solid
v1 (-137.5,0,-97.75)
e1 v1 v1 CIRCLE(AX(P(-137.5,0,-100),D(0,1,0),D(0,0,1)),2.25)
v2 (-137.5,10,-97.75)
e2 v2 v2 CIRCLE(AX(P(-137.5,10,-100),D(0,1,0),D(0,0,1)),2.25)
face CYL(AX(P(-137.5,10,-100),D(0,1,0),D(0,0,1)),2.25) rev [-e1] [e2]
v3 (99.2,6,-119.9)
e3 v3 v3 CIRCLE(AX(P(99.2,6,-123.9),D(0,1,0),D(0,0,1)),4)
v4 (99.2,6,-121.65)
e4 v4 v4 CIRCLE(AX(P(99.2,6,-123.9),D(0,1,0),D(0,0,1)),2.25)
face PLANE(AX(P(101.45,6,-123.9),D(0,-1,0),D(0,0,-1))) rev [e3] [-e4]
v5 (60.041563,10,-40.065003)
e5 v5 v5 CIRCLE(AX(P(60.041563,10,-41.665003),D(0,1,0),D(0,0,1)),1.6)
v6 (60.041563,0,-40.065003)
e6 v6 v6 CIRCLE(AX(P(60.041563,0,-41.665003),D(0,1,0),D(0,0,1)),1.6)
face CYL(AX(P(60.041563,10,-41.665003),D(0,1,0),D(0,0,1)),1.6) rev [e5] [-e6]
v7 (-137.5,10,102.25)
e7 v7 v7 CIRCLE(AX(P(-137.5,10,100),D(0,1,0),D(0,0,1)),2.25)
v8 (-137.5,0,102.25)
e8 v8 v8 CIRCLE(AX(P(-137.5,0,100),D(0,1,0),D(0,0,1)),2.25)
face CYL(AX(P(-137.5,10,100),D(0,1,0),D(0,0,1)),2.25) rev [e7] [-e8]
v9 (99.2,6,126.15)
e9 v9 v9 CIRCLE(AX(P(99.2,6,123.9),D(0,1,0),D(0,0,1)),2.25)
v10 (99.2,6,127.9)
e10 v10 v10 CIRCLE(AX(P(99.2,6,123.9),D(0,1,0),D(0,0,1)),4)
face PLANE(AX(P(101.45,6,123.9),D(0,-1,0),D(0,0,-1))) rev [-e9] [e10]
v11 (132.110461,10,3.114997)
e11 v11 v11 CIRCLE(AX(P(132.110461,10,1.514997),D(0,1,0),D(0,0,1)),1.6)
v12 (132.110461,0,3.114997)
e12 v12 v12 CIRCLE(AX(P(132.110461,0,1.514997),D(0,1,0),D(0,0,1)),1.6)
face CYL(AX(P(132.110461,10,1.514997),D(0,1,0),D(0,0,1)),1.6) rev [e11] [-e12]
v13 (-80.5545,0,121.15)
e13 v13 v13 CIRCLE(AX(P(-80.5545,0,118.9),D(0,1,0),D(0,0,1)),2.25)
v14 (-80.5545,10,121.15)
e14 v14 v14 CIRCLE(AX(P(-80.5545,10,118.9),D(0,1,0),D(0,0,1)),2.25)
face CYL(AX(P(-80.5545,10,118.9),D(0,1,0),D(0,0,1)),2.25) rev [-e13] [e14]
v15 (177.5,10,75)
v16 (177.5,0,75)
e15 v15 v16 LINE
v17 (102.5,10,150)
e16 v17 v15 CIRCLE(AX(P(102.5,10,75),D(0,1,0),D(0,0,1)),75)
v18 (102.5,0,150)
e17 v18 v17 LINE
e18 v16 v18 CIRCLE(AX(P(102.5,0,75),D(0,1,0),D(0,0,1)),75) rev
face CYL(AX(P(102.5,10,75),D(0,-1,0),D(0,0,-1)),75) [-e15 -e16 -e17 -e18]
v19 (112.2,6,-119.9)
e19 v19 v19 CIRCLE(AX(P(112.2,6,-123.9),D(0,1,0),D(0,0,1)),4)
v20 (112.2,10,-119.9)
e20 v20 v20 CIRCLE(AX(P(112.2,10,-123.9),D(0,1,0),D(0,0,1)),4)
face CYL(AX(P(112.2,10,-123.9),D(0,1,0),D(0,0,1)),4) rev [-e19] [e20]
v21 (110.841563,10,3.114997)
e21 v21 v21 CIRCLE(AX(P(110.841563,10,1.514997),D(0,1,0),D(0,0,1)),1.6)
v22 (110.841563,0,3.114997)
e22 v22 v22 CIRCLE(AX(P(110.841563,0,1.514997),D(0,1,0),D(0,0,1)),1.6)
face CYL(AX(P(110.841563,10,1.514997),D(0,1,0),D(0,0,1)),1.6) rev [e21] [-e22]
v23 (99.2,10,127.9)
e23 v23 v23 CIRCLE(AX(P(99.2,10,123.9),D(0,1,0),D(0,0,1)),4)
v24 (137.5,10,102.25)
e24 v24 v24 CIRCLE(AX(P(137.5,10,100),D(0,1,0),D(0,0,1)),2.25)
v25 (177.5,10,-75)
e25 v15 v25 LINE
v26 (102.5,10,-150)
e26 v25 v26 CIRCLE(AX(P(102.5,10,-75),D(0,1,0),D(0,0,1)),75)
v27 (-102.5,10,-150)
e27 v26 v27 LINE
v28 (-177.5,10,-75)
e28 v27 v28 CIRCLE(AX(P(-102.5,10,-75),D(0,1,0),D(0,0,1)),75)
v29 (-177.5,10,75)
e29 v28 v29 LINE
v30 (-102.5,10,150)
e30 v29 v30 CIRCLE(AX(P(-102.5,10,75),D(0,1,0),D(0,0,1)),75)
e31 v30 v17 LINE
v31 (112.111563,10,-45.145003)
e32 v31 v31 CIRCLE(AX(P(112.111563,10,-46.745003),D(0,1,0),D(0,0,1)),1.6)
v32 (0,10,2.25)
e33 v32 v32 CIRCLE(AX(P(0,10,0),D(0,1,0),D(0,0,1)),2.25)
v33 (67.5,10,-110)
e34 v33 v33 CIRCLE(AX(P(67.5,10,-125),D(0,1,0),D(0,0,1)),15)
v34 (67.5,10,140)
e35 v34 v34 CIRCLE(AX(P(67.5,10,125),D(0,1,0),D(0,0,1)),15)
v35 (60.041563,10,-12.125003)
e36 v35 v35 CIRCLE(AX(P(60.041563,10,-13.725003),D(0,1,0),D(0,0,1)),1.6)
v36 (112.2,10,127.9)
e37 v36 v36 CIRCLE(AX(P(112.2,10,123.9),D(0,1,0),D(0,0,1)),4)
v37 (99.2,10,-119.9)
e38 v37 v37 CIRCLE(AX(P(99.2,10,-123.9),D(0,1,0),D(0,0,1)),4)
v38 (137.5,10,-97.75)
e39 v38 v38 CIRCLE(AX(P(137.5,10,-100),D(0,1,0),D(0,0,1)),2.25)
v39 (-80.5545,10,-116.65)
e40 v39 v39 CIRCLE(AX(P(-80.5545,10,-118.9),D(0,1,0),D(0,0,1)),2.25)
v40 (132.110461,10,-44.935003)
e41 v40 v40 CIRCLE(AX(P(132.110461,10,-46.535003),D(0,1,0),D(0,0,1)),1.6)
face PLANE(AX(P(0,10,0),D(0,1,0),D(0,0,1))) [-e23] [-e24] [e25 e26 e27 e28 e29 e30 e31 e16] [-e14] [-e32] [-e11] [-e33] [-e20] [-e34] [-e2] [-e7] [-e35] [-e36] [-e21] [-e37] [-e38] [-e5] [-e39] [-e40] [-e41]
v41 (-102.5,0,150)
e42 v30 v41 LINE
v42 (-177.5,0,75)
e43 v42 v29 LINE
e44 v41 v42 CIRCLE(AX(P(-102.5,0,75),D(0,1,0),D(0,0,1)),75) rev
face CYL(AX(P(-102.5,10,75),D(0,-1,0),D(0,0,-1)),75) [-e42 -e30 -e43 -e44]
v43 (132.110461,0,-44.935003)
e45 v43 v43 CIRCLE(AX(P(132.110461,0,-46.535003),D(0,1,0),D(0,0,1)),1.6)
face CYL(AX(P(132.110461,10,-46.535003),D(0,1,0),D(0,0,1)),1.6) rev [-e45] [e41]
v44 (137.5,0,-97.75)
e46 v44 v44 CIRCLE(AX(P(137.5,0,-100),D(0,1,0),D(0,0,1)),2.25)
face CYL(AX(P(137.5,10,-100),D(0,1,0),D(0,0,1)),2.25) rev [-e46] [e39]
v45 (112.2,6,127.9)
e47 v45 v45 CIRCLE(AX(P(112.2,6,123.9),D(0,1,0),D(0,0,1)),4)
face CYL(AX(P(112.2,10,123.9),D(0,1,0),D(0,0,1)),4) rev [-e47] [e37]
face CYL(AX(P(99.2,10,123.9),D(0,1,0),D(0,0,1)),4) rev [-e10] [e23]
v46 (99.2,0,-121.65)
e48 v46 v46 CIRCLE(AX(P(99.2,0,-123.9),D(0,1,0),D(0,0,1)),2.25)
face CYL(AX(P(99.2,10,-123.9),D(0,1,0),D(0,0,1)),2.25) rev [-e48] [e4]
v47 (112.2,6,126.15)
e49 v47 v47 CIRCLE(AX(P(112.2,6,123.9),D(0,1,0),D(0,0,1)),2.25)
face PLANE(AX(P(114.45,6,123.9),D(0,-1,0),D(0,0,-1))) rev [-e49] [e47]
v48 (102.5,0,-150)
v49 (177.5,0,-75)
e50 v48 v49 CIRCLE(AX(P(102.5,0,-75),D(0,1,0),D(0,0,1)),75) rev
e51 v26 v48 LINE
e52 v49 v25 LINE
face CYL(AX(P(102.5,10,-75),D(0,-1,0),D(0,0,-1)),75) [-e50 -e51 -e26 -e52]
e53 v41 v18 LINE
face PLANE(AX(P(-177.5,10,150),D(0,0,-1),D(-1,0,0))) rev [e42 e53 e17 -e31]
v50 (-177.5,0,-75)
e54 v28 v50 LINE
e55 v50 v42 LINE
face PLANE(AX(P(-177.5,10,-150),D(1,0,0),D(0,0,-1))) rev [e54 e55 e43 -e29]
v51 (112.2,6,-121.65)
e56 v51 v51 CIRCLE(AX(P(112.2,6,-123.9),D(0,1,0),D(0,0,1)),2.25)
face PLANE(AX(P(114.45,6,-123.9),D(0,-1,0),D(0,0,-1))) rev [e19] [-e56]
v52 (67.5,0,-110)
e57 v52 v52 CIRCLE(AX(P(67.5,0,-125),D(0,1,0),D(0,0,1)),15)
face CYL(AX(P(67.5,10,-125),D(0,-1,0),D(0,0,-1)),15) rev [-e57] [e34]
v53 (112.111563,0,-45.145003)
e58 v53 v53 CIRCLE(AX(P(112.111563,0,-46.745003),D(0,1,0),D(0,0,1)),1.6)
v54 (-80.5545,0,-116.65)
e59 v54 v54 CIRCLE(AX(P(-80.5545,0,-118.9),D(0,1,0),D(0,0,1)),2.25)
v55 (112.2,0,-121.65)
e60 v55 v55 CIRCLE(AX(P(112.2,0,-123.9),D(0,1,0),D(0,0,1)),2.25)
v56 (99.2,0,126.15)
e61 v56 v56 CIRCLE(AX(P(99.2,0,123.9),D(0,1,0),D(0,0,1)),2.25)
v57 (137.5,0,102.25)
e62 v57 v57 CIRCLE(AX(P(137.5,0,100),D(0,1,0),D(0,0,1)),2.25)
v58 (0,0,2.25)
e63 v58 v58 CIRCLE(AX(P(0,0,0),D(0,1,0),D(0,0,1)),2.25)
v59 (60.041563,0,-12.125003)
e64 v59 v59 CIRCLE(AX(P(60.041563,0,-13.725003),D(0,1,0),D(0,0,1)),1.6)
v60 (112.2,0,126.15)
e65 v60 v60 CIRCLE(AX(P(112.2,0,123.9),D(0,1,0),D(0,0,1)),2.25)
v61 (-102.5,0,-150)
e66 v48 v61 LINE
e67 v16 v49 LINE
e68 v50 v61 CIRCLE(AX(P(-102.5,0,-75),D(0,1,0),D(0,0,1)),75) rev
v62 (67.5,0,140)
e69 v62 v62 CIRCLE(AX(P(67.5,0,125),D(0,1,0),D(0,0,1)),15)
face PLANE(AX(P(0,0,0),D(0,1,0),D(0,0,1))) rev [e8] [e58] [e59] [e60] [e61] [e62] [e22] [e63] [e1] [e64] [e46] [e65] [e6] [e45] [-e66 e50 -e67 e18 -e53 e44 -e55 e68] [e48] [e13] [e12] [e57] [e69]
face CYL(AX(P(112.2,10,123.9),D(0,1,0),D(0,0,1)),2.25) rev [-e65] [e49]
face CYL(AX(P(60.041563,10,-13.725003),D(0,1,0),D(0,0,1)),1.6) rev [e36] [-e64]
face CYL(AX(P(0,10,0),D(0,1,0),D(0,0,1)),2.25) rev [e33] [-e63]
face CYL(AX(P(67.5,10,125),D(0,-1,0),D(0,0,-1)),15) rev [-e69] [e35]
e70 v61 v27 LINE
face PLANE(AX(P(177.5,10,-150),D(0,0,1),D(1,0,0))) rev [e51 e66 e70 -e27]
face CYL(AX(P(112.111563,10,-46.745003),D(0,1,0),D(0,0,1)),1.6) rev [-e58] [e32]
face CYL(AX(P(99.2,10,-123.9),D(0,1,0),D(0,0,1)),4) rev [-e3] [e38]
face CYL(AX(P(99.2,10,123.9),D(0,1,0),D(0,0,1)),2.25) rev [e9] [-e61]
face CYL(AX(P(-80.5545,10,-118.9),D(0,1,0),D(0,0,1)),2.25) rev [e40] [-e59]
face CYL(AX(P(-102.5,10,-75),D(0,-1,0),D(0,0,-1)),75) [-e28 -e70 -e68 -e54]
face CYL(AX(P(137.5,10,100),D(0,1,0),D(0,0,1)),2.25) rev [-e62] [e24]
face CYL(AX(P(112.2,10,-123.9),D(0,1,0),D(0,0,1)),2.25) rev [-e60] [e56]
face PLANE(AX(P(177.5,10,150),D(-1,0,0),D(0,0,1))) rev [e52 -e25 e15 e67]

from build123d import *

# Parameters (mm, degrees)
SKETCH11_W                     = 355
SKETCH11_H                     = 300
SKETCH11_R                     = 15
BOSS_EXTRUDE2_DEPTH            = 10
CBORE_FOR_M4_SHCS2_D           = 4.5
CBORE_FOR_M4_SHCS2_CBORE_D     = 8
CBORE_FOR_M4_SHCS2_CBORE_DEPTH = 4
F_3_2_3_2_DIAMETER_HOLE2_D     = 3.2
M4_CLEARANCE_HOLE1_OUTLINE_R   = 2.25
M4_CLEARANCE_HOLE1_DEPTH       = 10
M4_CLEARANCE_HOLE2_D           = 4.5
FILLET1_R                      = 75


# Read off the part's stored shape, not the designer's step: M4 Clearance Hole1
with BuildPart() as part:
    # Sketch11 → Boss-Extrude2 (new body)
    with BuildSketch(Plane(origin=(0, 0, 0), x_dir=(1, 0, 0), z_dir=(0, 1, 0))):
        Rectangle(SKETCH11_W, SKETCH11_H)
        with Locations(Location((67.5, -125, 0), (0, 0, 270))):
            Circle(SKETCH11_R, mode=Mode.SUBTRACT)
        with Locations(Location((67.5, 125, 0), (0, 0, 270))):
            Circle(SKETCH11_R, mode=Mode.SUBTRACT)
    extrude(amount=BOSS_EXTRUDE2_DEPTH)

    # CBORE for M4 SHCS2 (through all)
    with Locations(Plane(origin=(0, 10, 0), x_dir=(1, 0, 0), z_dir=(0, 1, 0))):
        with Locations((99.2, 123.9), (112.2, 123.9), (112.2, -123.9), (99.2, -123.9)):
            CounterBoreHole(CBORE_FOR_M4_SHCS2_D / 2, CBORE_FOR_M4_SHCS2_CBORE_D / 2, CBORE_FOR_M4_SHCS2_CBORE_DEPTH)

    # Ø3.2 (3.2) Diameter Hole2 (through all)
    with Locations(Plane(origin=(0, 10, 0), x_dir=(1, 0, 0), z_dir=(0, 1, 0))):
        with Locations((132.110460528, 46.535002739), (112.111563058, 46.745002739), (110.841563058, -1.514997261), (132.110460528, -1.514997261), (60.041563058, 13.725002739), (60.041563058, 41.665002739)):
            Hole(F_3_2_3_2_DIAMETER_HOLE2_D / 2)

    # M4 Clearance Hole1 outline → M4 Clearance Hole1 (cut)
    with BuildSketch(Plane(origin=(0, 0, 0), x_dir=(1, 0, 0), z_dir=(0, 1, 0))):
        with Locations((137.5, 100)):
            Circle(M4_CLEARANCE_HOLE1_OUTLINE_R)
        with Locations((-137.5, -100)):
            Circle(M4_CLEARANCE_HOLE1_OUTLINE_R)
        with Locations((-137.5, 100)):
            Circle(M4_CLEARANCE_HOLE1_OUTLINE_R)
        with Locations((137.5, -100)):
            Circle(M4_CLEARANCE_HOLE1_OUTLINE_R)
        Circle(M4_CLEARANCE_HOLE1_OUTLINE_R)
    extrude(amount=M4_CLEARANCE_HOLE1_DEPTH, mode=Mode.SUBTRACT)

    # M4 Clearance Hole2 (through all)
    with Locations(Plane(origin=(0, 10, 0), x_dir=(1, 0, 0), z_dir=(0, 1, 0))):
        with Locations((-80.554499739, -118.9), (-80.554499739, 118.9)):
            Hole(M4_CLEARANCE_HOLE2_D / 2)

    # Fillet1
    fillet1_edges = [part.edges().sort_by_distance(p)[0] for p in [
        (177.5, 5, -150),
        (177.5, 5, 150),
        (-177.5, 5, 150),
        (-177.5, 5, -150),
    ]]
    fillet(fillet1_edges, radius=FILLET1_R)


solid = part.part
